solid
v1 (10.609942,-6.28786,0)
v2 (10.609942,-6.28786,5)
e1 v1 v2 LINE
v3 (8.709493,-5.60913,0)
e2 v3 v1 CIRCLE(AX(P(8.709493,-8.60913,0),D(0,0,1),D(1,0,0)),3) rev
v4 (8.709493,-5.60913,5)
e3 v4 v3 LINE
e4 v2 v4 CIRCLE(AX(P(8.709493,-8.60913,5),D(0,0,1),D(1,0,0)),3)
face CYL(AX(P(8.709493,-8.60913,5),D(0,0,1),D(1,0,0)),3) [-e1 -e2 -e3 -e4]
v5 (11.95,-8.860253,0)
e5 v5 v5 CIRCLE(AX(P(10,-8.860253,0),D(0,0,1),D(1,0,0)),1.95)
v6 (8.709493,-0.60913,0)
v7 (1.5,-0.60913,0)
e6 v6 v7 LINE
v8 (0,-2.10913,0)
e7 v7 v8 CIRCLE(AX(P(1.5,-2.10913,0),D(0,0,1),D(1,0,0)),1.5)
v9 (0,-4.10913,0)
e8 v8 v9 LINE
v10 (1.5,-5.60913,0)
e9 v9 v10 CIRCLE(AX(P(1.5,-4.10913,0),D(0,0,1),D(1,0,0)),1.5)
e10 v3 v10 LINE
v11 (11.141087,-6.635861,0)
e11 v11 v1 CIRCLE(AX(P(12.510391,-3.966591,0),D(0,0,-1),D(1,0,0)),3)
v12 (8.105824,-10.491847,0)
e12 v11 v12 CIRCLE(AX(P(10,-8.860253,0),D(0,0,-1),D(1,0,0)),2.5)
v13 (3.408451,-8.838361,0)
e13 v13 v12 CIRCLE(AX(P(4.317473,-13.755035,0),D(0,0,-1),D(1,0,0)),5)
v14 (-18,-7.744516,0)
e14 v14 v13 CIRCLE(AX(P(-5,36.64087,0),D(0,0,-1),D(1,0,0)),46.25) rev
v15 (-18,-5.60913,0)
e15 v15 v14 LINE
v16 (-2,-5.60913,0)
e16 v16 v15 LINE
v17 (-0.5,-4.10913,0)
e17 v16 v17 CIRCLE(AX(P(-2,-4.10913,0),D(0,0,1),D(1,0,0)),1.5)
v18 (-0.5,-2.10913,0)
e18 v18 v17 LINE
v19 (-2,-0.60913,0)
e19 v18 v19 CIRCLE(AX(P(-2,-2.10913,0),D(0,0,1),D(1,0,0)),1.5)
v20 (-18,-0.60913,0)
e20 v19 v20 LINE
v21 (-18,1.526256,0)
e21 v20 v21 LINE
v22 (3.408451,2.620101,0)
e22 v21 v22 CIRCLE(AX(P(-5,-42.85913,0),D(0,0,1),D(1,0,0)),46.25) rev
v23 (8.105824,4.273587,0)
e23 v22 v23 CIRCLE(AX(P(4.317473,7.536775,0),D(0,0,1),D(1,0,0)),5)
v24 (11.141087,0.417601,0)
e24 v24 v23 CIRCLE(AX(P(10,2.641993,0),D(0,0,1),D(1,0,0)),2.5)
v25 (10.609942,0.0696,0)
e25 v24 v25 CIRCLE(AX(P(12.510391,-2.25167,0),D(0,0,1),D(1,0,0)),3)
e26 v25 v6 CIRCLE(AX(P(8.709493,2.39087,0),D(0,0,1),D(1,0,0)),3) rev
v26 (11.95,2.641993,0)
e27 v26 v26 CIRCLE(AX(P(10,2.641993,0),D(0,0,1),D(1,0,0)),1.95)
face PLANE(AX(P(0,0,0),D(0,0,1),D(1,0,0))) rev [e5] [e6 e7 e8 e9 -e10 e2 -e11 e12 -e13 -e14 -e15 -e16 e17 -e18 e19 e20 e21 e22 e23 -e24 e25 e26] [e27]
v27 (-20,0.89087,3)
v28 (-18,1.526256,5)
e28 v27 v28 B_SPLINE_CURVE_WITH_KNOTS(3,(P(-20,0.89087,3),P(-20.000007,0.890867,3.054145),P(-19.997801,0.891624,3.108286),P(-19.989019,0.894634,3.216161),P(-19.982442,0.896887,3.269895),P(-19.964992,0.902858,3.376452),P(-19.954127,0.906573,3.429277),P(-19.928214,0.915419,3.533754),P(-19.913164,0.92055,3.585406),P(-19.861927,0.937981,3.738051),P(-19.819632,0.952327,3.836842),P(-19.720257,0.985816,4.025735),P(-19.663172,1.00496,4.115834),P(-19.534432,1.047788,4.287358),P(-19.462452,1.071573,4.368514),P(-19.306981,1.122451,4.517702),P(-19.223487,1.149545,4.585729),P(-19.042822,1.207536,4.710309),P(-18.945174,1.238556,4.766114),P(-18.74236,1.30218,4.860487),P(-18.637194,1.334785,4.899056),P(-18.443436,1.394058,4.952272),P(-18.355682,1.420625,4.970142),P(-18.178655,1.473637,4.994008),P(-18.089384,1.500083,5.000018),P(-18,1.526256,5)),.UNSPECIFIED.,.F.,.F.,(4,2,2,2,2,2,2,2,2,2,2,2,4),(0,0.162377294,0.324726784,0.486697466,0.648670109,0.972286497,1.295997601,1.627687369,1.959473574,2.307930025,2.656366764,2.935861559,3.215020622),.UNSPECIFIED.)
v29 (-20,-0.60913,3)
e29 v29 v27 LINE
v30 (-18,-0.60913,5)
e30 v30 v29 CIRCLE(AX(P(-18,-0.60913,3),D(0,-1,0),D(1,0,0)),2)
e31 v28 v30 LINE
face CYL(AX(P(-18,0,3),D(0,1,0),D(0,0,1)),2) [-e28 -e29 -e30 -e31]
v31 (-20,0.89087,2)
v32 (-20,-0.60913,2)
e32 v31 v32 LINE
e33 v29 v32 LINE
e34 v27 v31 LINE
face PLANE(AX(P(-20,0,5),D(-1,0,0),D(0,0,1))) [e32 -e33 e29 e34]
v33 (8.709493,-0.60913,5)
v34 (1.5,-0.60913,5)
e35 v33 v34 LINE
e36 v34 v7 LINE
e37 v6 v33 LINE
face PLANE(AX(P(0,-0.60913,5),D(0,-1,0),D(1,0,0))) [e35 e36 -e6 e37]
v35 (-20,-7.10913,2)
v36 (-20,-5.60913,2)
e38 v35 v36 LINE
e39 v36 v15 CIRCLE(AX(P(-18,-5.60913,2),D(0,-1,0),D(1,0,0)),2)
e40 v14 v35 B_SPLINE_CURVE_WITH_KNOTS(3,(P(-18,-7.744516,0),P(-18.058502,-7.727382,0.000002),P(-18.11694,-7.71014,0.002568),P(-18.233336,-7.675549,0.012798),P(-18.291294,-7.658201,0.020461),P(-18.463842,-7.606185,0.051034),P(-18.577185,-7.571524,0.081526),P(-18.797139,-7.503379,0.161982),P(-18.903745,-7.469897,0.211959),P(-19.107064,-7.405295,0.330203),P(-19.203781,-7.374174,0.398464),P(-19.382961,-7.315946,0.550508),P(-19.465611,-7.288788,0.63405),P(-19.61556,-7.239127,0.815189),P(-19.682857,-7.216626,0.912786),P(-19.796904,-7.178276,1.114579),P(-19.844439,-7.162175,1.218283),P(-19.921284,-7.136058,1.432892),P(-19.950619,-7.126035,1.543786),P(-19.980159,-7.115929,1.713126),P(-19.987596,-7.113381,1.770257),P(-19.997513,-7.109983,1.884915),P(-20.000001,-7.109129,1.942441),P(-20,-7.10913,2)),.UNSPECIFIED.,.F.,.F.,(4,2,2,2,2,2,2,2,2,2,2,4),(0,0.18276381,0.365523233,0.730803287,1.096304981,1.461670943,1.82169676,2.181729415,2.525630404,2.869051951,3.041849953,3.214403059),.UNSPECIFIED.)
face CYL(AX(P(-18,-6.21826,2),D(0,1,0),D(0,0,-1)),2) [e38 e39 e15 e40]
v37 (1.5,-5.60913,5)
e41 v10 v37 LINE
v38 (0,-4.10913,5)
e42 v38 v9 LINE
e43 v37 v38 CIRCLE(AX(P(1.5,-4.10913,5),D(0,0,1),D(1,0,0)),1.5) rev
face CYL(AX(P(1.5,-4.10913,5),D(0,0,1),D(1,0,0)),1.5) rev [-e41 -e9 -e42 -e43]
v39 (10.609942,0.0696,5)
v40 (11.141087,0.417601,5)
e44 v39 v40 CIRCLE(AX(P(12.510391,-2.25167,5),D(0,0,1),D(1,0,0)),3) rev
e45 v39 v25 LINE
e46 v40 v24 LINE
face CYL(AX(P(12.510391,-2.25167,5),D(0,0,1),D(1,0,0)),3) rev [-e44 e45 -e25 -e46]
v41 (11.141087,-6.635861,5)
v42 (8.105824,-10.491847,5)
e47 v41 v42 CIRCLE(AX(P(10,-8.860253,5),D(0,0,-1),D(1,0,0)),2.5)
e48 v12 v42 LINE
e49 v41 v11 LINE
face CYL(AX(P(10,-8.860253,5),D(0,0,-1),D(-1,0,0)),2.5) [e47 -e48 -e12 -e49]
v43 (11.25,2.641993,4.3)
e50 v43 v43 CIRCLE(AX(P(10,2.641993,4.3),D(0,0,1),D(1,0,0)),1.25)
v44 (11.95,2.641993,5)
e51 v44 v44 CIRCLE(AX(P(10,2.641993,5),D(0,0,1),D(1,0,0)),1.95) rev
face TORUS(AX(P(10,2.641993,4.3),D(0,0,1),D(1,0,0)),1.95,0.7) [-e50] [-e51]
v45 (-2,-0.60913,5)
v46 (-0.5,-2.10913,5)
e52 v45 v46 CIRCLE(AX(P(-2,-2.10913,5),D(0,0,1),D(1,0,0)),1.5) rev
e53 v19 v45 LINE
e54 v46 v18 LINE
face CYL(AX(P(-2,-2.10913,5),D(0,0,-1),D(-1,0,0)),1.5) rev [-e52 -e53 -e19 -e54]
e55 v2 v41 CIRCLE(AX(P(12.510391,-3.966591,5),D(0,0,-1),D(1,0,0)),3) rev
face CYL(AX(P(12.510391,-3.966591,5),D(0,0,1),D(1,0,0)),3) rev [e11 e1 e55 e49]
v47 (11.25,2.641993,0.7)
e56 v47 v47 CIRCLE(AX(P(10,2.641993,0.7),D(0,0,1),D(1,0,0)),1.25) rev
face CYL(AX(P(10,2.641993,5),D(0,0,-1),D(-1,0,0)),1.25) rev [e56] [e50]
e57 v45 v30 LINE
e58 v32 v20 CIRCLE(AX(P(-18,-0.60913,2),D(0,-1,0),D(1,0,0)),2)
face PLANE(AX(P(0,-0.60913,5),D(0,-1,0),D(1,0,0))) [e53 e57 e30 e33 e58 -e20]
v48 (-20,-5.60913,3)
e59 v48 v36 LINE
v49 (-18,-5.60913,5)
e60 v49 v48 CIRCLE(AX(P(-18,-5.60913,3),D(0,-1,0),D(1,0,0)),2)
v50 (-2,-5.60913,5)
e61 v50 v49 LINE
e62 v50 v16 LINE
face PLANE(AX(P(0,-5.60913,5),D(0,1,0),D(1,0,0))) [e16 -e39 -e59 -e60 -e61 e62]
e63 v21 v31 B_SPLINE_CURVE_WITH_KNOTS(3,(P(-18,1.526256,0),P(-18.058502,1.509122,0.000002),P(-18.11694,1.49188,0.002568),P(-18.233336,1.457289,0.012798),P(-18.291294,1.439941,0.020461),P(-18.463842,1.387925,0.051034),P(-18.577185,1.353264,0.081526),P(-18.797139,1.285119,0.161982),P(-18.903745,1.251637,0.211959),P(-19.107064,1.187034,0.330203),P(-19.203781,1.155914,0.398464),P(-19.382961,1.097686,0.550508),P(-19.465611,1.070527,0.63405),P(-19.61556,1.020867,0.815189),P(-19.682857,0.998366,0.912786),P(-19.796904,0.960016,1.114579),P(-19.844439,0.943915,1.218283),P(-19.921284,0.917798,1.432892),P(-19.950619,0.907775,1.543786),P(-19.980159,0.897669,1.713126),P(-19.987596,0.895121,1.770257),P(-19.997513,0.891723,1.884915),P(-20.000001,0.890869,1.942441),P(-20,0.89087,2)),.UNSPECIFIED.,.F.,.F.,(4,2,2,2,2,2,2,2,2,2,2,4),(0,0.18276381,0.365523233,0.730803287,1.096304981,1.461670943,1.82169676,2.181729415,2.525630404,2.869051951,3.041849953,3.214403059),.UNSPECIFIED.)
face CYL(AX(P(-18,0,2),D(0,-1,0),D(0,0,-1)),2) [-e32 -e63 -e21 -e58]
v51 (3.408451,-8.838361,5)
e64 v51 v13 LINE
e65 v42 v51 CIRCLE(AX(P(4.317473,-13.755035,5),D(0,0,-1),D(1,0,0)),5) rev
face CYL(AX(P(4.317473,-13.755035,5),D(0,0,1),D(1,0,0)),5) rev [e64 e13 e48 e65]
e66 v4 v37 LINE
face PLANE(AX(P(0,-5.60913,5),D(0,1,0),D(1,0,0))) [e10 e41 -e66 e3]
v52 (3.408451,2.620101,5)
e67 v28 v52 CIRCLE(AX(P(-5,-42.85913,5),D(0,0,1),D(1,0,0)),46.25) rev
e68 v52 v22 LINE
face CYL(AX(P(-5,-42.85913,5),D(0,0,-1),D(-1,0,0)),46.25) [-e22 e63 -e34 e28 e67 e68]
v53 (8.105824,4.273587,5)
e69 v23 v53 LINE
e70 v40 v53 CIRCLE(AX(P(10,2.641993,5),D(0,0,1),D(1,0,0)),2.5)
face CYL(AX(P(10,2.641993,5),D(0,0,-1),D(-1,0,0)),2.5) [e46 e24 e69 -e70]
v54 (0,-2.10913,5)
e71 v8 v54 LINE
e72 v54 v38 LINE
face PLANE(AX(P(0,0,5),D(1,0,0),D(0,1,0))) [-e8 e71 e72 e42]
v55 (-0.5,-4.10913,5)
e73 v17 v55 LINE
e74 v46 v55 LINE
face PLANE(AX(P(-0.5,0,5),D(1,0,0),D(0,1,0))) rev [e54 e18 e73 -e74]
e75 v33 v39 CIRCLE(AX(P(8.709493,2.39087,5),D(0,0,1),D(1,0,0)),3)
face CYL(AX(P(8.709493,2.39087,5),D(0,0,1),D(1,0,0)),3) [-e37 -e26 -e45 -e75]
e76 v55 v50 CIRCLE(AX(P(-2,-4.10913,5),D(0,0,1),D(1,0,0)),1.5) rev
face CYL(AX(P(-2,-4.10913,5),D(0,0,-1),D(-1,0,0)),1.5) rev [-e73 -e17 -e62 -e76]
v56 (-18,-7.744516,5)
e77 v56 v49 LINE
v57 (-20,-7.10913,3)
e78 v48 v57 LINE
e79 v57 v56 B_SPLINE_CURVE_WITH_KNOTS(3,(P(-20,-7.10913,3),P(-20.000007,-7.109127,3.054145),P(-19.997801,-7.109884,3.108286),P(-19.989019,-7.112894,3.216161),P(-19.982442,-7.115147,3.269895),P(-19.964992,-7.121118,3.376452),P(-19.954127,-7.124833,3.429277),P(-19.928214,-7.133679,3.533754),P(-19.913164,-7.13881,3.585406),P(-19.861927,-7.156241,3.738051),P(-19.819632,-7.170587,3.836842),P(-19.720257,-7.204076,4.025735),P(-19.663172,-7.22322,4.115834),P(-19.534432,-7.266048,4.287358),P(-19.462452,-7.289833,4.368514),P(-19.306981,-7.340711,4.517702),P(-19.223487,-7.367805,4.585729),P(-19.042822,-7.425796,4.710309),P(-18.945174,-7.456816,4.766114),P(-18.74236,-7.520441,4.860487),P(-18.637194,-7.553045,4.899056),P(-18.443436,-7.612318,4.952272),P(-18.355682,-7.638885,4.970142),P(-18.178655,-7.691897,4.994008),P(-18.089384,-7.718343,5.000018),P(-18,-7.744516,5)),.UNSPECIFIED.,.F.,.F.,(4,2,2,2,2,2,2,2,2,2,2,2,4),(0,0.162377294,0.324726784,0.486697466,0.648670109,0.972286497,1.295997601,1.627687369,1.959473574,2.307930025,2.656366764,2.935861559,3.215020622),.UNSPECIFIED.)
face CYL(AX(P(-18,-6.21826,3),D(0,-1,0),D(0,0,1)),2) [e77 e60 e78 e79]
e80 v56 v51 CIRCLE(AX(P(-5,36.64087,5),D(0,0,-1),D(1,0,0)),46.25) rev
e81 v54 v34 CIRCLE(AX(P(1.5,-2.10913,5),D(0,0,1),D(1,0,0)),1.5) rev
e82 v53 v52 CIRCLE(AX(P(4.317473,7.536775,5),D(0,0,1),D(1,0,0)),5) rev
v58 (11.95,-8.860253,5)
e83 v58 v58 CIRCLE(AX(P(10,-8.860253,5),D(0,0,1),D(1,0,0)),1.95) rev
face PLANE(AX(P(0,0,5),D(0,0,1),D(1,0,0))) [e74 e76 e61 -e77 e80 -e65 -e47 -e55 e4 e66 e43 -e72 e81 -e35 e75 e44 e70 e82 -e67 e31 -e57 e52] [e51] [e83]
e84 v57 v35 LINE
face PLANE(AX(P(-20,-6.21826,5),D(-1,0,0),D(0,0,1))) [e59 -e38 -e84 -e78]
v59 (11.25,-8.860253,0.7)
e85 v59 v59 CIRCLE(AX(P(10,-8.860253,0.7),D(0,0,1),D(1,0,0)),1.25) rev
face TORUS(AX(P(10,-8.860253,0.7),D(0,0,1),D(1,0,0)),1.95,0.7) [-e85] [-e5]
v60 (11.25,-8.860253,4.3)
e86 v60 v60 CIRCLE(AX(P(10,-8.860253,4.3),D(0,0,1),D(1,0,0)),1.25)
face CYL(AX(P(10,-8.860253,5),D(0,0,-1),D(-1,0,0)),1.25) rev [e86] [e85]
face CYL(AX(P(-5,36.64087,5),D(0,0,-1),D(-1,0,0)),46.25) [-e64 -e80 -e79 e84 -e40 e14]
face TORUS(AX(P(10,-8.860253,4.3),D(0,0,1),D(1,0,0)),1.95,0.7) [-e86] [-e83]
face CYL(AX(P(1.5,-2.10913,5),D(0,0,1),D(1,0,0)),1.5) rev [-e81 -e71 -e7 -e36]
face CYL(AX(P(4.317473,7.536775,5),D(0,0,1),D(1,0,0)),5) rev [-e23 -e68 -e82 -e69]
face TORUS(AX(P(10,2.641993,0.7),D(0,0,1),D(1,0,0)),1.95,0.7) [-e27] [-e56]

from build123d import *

# Parameters (mm, degrees)
SKETCH1_R           = 1.25
BOSS_EXTRUDE1_DEPTH = 5
FILLET3_R           = 2
FILLET4_R           = 3
FILLET5_R           = 5
FILLET6_R           = 1.5
FILLET8_R           = 0.7
FILLET9_R           = 3


with BuildPart() as part:
    # Sketch1 → Boss-Extrude1 (new body)
    with BuildSketch(Plane.XY):
        with BuildLine():
            Line((10, -0.609130042), (10, 0.141993323))
            ThreePointArc((10, 0.141993323), (11.352749323, 4.744389401), (7.724788103, 1.605937907))
            ThreePointArc((7.724788103, 1.605937907), (-6.192467122, 3.375494669), (-20, 0.890869958))
            Line((-20, 0.890869958), (-20, -0.609130042))
            Line((-20, -0.609130042), (-0.5, -0.609130042))
            Line((-0.5, -0.609130042), (-0.5, -3.109130042))
            Line((-0.5, -3.109130042), (0, -3.109130042))
            Line((0, -3.109130042), (0, -0.609130042))
            Line((0, -0.609130042), (10, -0.609130042))
        make_face()
        with Locations((10, 2.641993323)):
            Circle(SKETCH1_R, mode=Mode.SUBTRACT)
    extrude(amount=BOSS_EXTRUDE1_DEPTH)

    # Fillet3
    fillet3_edges = [part.edges().sort_by_distance(p)[0] for p in [
        (-20, 0.140869958, 0),
        (-20, 0.140869958, 5),
    ]]
    fillet(fillet3_edges, radius=FILLET3_R)

    # Fillet4
    # the kernel refuses this fillet: 3 mm, written as the material it adds along each edge
    with BuildSketch(Plane(origin=(10, 0.141993323, 0), x_dir=(0.9720485785633484, 0.23477981368289305, 0), z_dir=(0, 0, 1))) as fillet4_piece_1:
        with BuildLine():
            CenterArc((1.878238509, -2.916145736), FILLET4_R, 103.578643904, 29.646140471)
            Line((-0.176348604, -0.730128399), (-0.217440346, -0.686408053))
            ThreePointArc((-0.217440346, -0.686408053), (-0.146497217, -0.350977411), (-0.058322915, 0.014086789))
            Line((-0.058322915, 0.014086789), (0.014086789, 0.058322915))
            ThreePointArc((0.014086789, 0.058322915), (0.586949534, -0.009878554), (1.15981228, 0.058322915))
            Line((1.15981228, 0.058322915), (1.173899068, 0))
        make_face()
    extrude(amount=5)

    # Fillet5
    fillet5_edges = [part.edges().sort_by_distance(p)[0] for p in [
        (7.724788103, 1.605937907, 2.5),
    ]]
    fillet(fillet5_edges, radius=FILLET5_R)

    # Mirror2: part across plane


with BuildPart() as part_1:
    add(part.part)
    add(part.part.mirror(Plane(origin=(0, -3.109130042, 0), x_dir=(0, 0, 1), z_dir=(0, -1, 0))))

    # Fillet6
    fillet6_edges = [part_1.edges().sort_by_distance(p)[0] for p in [
        (0, -0.609130042, 2.5),
        (-0.5, -0.609130042, 2.5),
        (-0.5, -5.609130042, 2.5),
        (0, -5.609130042, 2.5),
    ]]
    fillet(fillet6_edges, radius=FILLET6_R)

    # Fillet8
    fillet8_edges = [part_1.edges().sort_by_distance(p)[0] for p in [
        (8.75, 2.641993323, 5),
        (8.75, 2.641993323, 0),
        (8.75, -8.860253407, 5),
        (8.75, -8.860253407, 0),
    ]]
    fillet(fillet8_edges, radius=FILLET8_R)

    # Fillet9
    fillet9_edges = [part_1.edges().sort_by_distance(p)[0] for p in [
        (10, -0.609130042, 2.5),
        (10, -5.609130042, 2.5),
    ]]
    fillet(fillet9_edges, radius=FILLET9_R)


solid = part_1.part
